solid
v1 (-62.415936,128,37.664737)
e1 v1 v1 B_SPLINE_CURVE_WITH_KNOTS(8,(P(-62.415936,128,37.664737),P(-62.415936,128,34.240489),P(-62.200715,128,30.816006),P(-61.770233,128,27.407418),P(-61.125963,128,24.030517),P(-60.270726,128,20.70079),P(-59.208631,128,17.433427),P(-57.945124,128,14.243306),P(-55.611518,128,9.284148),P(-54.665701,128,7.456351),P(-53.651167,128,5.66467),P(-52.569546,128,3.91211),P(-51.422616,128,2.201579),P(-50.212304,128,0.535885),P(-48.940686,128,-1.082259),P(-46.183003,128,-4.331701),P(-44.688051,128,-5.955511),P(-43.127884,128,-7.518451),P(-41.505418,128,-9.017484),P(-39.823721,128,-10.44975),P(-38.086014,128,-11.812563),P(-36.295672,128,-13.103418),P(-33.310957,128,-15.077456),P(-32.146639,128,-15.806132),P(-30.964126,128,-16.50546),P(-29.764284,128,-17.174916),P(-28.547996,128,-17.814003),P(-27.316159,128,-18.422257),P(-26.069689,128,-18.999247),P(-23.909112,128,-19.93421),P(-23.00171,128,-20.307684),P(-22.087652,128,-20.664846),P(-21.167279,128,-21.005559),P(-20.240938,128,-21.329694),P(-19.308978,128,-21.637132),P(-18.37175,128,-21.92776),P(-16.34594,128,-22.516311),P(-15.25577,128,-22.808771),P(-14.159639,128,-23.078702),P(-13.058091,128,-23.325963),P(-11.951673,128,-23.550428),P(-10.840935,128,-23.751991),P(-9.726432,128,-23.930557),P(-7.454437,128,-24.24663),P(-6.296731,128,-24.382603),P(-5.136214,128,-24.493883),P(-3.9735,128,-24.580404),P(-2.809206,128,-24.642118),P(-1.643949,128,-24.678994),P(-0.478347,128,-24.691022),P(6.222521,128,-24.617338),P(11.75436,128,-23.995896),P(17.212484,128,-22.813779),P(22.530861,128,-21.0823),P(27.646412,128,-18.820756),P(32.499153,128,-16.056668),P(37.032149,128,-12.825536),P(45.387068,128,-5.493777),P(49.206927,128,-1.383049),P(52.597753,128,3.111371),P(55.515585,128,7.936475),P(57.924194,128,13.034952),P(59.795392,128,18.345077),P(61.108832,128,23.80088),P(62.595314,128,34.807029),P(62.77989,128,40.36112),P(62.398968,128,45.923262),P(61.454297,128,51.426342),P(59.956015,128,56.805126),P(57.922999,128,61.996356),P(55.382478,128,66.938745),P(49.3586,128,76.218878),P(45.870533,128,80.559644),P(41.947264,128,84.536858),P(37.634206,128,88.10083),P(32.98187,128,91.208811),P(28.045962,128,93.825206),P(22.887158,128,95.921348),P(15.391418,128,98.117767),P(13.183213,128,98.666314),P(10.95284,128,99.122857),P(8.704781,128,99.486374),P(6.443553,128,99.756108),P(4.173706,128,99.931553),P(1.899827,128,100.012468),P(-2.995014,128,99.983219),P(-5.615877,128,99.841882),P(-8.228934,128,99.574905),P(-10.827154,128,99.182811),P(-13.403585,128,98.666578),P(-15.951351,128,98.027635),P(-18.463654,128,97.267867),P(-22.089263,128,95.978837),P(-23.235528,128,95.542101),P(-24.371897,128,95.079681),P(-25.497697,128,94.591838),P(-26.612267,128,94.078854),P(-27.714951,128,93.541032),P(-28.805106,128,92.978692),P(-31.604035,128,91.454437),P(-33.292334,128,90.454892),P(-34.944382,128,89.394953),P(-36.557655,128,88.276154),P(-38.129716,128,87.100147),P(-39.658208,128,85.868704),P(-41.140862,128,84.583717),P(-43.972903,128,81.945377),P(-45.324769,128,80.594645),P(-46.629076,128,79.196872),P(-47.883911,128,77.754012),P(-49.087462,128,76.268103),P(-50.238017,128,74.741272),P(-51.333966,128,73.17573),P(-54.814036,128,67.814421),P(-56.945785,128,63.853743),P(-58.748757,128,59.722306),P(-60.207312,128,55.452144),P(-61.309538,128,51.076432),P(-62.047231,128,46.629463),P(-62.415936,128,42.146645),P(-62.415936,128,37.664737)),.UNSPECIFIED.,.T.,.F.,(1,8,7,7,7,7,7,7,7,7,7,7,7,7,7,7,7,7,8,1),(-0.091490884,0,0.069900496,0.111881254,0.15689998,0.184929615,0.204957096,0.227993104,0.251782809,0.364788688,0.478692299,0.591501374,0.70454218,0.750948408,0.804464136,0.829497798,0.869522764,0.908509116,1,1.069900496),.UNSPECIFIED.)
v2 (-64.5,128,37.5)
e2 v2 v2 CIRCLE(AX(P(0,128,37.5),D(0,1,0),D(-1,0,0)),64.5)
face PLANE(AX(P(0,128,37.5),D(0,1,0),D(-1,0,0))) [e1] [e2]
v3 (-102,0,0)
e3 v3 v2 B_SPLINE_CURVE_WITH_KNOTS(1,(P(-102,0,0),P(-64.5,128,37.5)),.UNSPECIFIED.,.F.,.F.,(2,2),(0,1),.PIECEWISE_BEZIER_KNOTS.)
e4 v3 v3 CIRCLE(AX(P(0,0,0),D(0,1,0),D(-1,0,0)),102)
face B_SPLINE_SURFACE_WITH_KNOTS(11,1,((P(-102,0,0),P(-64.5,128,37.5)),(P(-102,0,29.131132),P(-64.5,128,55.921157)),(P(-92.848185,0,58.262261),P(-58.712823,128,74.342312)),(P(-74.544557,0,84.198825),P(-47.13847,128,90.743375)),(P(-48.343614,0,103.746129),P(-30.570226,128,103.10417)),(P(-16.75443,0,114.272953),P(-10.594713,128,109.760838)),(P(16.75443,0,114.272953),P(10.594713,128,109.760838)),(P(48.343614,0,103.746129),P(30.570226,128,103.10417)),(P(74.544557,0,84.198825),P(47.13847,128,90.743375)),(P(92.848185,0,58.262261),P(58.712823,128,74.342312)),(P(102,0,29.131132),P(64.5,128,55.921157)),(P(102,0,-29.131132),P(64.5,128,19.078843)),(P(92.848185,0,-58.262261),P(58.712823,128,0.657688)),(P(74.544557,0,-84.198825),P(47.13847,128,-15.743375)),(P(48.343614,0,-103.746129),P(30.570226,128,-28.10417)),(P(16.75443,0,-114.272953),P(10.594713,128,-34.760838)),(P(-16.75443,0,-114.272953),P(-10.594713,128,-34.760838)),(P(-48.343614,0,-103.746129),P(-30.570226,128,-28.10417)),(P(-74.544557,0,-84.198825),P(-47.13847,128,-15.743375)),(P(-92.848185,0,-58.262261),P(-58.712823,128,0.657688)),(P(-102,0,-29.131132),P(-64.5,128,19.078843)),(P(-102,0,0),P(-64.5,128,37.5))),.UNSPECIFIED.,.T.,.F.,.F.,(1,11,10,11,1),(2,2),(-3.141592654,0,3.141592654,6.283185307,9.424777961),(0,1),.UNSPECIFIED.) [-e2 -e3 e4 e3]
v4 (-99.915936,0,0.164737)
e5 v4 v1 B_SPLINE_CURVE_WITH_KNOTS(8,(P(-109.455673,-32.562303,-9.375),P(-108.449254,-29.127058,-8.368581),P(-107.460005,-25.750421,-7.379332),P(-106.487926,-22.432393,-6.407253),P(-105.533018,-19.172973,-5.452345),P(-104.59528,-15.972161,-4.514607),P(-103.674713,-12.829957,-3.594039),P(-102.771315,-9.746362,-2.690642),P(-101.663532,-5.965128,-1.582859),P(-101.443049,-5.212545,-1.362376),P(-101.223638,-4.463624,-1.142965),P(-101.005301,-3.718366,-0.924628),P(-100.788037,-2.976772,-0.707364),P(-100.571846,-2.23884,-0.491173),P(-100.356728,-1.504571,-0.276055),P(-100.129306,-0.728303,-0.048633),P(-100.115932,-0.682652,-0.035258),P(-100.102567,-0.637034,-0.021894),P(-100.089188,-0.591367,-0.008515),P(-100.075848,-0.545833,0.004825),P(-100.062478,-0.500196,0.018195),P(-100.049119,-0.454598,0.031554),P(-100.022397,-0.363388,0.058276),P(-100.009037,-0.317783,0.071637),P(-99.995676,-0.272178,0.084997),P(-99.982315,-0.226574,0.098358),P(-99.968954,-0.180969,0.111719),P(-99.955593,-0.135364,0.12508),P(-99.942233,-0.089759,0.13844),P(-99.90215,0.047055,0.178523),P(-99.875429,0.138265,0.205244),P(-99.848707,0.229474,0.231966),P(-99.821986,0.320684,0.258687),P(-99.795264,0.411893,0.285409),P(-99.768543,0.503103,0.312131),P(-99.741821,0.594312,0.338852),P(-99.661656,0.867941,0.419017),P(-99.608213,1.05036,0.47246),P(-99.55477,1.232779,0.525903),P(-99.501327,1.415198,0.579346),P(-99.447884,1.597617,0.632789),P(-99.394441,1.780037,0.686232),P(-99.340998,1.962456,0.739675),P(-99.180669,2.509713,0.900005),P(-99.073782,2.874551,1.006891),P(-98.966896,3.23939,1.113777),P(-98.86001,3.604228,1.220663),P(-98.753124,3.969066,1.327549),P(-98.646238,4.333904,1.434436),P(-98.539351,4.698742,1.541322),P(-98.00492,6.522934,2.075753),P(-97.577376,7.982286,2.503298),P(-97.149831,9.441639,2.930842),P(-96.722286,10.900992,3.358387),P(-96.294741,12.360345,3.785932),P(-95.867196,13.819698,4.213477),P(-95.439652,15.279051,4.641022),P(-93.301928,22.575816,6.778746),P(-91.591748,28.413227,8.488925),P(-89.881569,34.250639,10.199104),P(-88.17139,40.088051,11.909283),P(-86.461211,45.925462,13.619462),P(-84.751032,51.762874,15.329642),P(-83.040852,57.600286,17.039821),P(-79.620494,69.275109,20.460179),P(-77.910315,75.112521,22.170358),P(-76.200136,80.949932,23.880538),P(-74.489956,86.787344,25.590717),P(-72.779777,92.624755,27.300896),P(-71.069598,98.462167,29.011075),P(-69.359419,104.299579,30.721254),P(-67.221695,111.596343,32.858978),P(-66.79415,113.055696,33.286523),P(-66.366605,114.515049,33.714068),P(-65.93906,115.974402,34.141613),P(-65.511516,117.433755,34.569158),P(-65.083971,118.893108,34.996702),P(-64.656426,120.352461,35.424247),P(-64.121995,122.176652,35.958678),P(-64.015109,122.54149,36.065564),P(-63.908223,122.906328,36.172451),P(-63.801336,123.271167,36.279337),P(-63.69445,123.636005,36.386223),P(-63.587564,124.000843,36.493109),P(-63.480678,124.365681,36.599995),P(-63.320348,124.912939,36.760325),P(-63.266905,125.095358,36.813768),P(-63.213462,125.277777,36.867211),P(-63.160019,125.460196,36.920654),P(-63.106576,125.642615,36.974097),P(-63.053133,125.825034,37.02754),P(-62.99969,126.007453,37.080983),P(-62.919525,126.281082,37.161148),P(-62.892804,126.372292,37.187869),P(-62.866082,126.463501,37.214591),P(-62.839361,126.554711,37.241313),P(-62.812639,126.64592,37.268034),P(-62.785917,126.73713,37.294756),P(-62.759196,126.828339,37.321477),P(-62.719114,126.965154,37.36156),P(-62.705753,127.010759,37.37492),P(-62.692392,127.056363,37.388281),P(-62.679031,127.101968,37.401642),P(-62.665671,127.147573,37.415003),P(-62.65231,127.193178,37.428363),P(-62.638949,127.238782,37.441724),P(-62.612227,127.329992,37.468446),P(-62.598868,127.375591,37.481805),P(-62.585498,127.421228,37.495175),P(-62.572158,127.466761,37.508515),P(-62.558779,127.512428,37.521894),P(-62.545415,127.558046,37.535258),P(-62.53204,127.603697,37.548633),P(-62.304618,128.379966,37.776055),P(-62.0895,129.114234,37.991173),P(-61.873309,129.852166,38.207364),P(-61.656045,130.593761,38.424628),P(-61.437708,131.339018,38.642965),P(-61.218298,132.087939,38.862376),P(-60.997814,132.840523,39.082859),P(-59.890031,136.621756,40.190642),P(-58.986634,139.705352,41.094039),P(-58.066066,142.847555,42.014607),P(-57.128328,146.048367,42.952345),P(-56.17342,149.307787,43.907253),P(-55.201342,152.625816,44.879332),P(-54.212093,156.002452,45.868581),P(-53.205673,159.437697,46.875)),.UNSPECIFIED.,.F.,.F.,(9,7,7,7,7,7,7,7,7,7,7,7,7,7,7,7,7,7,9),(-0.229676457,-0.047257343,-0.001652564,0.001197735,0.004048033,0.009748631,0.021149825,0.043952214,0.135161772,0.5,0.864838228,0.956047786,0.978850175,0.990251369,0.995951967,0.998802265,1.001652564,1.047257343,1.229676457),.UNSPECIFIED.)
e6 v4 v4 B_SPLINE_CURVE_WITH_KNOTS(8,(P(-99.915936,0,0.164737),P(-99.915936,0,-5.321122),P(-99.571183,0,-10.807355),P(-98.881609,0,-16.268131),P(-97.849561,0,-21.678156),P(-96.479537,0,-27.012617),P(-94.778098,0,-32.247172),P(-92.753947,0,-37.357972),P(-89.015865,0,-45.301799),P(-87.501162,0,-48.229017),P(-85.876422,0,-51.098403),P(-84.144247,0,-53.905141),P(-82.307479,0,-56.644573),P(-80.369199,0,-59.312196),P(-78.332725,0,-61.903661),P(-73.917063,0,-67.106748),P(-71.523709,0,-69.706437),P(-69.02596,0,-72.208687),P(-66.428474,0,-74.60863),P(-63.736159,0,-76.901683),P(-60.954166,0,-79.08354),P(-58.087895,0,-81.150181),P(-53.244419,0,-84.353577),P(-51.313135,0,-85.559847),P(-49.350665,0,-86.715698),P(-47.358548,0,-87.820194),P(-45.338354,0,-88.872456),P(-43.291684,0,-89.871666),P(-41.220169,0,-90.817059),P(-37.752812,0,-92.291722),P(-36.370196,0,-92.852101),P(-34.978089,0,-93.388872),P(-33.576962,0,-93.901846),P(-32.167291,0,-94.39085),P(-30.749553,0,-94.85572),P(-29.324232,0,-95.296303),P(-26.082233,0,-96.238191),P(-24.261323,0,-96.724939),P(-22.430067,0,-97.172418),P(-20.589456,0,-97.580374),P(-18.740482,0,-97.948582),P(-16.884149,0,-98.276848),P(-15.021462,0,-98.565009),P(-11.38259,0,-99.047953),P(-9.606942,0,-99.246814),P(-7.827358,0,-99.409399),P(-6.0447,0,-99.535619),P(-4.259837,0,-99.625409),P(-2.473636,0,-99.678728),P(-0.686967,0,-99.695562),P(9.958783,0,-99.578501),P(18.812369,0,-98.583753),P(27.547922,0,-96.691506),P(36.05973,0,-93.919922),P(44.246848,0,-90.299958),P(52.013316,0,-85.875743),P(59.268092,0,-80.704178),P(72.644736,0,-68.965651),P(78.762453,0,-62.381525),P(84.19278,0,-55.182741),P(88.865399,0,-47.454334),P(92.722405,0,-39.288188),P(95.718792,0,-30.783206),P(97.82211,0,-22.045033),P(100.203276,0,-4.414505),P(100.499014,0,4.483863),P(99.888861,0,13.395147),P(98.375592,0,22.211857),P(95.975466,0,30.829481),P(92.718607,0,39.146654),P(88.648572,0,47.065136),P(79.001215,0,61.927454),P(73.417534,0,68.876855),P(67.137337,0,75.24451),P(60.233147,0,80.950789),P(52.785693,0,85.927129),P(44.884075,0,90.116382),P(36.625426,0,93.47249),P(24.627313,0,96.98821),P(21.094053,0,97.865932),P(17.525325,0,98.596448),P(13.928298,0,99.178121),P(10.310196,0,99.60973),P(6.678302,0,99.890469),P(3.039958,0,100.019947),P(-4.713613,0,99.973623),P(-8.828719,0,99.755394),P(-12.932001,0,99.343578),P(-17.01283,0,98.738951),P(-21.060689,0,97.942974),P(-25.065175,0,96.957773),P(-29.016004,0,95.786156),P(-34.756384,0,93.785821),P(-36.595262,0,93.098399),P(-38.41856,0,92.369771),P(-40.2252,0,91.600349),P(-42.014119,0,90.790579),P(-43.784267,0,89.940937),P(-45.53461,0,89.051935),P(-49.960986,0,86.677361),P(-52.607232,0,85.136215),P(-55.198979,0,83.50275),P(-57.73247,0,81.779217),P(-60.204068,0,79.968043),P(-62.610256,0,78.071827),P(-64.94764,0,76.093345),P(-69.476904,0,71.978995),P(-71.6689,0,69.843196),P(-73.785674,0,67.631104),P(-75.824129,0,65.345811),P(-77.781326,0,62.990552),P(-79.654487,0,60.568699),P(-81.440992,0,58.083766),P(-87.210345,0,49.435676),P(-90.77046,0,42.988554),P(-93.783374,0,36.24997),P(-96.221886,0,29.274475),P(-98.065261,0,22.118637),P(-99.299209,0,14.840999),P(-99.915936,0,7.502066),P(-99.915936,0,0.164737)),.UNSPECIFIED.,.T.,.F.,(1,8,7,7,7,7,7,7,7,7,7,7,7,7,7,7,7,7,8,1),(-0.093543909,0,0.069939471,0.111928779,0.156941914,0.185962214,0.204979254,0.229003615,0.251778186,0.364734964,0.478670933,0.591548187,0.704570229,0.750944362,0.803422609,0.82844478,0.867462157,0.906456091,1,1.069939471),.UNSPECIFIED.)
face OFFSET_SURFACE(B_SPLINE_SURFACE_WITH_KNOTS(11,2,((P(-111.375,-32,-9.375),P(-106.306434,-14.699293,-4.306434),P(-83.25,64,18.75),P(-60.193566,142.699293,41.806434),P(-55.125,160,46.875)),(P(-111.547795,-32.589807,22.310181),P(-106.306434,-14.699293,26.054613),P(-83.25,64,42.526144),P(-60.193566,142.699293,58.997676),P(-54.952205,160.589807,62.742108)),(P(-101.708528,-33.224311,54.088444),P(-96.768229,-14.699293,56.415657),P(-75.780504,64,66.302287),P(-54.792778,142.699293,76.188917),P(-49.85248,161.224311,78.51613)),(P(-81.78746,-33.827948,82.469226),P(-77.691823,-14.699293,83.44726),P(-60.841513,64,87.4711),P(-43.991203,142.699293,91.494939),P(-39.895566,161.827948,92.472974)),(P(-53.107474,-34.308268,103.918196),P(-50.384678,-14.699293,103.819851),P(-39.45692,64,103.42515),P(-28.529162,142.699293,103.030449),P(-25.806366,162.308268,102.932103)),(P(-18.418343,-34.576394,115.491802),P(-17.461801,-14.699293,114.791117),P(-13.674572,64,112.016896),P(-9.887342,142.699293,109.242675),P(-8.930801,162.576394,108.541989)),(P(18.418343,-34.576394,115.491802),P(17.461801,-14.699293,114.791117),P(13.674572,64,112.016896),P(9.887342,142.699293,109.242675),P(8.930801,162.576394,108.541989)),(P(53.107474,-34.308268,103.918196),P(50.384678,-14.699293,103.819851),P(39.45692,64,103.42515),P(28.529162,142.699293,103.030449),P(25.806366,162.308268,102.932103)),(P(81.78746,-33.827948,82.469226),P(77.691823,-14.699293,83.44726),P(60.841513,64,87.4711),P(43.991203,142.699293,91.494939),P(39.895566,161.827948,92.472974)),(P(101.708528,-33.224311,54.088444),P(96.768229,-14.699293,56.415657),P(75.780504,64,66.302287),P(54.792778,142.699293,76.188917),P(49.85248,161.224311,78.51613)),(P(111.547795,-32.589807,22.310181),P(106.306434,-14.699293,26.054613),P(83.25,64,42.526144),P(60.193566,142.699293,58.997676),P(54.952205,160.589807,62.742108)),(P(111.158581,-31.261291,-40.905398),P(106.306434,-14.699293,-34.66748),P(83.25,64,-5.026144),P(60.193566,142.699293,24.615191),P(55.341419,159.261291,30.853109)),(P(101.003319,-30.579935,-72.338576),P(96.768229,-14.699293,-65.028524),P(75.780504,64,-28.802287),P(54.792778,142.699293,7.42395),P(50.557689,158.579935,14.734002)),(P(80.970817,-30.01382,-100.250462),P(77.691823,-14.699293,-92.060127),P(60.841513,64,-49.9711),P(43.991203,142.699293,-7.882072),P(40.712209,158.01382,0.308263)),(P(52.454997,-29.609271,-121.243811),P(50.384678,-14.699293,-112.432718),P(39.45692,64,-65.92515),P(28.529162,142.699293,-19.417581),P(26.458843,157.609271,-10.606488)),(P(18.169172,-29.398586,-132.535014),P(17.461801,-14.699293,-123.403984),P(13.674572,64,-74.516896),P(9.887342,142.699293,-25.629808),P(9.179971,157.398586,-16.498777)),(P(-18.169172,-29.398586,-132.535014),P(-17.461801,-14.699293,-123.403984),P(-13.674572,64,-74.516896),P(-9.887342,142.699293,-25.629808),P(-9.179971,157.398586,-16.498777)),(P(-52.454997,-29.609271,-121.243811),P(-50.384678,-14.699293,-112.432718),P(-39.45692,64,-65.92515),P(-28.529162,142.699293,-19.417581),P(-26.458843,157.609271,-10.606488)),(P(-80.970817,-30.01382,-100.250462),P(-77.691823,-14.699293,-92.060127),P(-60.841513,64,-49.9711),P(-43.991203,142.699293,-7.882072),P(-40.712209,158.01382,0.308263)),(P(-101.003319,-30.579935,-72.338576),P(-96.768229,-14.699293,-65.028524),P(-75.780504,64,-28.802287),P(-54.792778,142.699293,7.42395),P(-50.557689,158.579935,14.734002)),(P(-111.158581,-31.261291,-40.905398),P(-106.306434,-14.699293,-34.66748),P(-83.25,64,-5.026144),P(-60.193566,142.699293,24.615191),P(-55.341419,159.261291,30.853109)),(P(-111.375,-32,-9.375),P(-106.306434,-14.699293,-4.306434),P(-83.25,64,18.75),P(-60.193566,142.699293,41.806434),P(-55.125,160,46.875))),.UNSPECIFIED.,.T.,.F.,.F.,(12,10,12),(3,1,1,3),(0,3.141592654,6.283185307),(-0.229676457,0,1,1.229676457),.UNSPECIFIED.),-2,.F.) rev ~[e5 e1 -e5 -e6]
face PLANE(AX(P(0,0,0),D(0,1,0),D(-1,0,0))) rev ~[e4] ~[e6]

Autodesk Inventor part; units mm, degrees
ref_plane "YZ Plane" through (0, 0, 0) normal (1, 0, 0) x (0, 1, 0)
ref_plane "XY Plane" through (0, 0, 0) normal (0, 0, 1) x (1, 0, 0)
sketch "Szkic6" plane through (0, 0, 0) normal (0, 1, 0) x (-1, 0, 0)
  circle A0 centre (0, 0) radius 102
  dimension "d33" = 204
ref_plane "Płaszczyzna konstrukcyjna1" through (0, 128, 0) normal (0, 1, 0) x (-1, 0, 0)
sketch "Szkic7" plane through (0, 128, 0) normal (0, 1, 0) x (-1, 0, 0)
  circle A0 centre (0, 37.5) radius 64.5
  line L0 (0, -20.3) -> (0, 20.3) construction
  circle A1 centre (0, 0) radius 102 construction
  dimension "d35" = 129
loft "Wyciągnięcie złożone1" add profiles "Szkic6", "Szkic7"
shell "Skorupa1" thickness 2 removed faces 2 at (-29.3695, 128, 29.6305) at (-13.1975, 0, 28.9105)
equation "\"d33\" = OD1"
equation "\"d35\" = OD2"
equation "\"d52\" = THK"
equation "\"SzerokośćGięciaPodcięcia\" = Grubość"
equation "\"RozmiarPodcięciaNarożnika\" = 4 * Grubość"
equation "\"PromieńPrzejścia\" = PromieńGięcia"
equation "\"Rozmiar_promienia_Jacobiego\" = PromieńGięcia"
equation "\"Wielk_odstępu\" = Grubość"
equation "\"d2\" = PromieńGięcia"
equation "\"d23\" = PromieńGięcia"
equation "\"OD1\" = 204"
equation "\"OD2\" = 129"
equation "\"L\" = 128"
equation "\"THK\" = 2"
equation "\"d34\" = L"
equation "\"Grubość\" = 1.5"
equation "\"PromieńGięcia\" = 3"
properties part number "Redukcja asymetryczna Ø204x129x2 L=128" material "304"
